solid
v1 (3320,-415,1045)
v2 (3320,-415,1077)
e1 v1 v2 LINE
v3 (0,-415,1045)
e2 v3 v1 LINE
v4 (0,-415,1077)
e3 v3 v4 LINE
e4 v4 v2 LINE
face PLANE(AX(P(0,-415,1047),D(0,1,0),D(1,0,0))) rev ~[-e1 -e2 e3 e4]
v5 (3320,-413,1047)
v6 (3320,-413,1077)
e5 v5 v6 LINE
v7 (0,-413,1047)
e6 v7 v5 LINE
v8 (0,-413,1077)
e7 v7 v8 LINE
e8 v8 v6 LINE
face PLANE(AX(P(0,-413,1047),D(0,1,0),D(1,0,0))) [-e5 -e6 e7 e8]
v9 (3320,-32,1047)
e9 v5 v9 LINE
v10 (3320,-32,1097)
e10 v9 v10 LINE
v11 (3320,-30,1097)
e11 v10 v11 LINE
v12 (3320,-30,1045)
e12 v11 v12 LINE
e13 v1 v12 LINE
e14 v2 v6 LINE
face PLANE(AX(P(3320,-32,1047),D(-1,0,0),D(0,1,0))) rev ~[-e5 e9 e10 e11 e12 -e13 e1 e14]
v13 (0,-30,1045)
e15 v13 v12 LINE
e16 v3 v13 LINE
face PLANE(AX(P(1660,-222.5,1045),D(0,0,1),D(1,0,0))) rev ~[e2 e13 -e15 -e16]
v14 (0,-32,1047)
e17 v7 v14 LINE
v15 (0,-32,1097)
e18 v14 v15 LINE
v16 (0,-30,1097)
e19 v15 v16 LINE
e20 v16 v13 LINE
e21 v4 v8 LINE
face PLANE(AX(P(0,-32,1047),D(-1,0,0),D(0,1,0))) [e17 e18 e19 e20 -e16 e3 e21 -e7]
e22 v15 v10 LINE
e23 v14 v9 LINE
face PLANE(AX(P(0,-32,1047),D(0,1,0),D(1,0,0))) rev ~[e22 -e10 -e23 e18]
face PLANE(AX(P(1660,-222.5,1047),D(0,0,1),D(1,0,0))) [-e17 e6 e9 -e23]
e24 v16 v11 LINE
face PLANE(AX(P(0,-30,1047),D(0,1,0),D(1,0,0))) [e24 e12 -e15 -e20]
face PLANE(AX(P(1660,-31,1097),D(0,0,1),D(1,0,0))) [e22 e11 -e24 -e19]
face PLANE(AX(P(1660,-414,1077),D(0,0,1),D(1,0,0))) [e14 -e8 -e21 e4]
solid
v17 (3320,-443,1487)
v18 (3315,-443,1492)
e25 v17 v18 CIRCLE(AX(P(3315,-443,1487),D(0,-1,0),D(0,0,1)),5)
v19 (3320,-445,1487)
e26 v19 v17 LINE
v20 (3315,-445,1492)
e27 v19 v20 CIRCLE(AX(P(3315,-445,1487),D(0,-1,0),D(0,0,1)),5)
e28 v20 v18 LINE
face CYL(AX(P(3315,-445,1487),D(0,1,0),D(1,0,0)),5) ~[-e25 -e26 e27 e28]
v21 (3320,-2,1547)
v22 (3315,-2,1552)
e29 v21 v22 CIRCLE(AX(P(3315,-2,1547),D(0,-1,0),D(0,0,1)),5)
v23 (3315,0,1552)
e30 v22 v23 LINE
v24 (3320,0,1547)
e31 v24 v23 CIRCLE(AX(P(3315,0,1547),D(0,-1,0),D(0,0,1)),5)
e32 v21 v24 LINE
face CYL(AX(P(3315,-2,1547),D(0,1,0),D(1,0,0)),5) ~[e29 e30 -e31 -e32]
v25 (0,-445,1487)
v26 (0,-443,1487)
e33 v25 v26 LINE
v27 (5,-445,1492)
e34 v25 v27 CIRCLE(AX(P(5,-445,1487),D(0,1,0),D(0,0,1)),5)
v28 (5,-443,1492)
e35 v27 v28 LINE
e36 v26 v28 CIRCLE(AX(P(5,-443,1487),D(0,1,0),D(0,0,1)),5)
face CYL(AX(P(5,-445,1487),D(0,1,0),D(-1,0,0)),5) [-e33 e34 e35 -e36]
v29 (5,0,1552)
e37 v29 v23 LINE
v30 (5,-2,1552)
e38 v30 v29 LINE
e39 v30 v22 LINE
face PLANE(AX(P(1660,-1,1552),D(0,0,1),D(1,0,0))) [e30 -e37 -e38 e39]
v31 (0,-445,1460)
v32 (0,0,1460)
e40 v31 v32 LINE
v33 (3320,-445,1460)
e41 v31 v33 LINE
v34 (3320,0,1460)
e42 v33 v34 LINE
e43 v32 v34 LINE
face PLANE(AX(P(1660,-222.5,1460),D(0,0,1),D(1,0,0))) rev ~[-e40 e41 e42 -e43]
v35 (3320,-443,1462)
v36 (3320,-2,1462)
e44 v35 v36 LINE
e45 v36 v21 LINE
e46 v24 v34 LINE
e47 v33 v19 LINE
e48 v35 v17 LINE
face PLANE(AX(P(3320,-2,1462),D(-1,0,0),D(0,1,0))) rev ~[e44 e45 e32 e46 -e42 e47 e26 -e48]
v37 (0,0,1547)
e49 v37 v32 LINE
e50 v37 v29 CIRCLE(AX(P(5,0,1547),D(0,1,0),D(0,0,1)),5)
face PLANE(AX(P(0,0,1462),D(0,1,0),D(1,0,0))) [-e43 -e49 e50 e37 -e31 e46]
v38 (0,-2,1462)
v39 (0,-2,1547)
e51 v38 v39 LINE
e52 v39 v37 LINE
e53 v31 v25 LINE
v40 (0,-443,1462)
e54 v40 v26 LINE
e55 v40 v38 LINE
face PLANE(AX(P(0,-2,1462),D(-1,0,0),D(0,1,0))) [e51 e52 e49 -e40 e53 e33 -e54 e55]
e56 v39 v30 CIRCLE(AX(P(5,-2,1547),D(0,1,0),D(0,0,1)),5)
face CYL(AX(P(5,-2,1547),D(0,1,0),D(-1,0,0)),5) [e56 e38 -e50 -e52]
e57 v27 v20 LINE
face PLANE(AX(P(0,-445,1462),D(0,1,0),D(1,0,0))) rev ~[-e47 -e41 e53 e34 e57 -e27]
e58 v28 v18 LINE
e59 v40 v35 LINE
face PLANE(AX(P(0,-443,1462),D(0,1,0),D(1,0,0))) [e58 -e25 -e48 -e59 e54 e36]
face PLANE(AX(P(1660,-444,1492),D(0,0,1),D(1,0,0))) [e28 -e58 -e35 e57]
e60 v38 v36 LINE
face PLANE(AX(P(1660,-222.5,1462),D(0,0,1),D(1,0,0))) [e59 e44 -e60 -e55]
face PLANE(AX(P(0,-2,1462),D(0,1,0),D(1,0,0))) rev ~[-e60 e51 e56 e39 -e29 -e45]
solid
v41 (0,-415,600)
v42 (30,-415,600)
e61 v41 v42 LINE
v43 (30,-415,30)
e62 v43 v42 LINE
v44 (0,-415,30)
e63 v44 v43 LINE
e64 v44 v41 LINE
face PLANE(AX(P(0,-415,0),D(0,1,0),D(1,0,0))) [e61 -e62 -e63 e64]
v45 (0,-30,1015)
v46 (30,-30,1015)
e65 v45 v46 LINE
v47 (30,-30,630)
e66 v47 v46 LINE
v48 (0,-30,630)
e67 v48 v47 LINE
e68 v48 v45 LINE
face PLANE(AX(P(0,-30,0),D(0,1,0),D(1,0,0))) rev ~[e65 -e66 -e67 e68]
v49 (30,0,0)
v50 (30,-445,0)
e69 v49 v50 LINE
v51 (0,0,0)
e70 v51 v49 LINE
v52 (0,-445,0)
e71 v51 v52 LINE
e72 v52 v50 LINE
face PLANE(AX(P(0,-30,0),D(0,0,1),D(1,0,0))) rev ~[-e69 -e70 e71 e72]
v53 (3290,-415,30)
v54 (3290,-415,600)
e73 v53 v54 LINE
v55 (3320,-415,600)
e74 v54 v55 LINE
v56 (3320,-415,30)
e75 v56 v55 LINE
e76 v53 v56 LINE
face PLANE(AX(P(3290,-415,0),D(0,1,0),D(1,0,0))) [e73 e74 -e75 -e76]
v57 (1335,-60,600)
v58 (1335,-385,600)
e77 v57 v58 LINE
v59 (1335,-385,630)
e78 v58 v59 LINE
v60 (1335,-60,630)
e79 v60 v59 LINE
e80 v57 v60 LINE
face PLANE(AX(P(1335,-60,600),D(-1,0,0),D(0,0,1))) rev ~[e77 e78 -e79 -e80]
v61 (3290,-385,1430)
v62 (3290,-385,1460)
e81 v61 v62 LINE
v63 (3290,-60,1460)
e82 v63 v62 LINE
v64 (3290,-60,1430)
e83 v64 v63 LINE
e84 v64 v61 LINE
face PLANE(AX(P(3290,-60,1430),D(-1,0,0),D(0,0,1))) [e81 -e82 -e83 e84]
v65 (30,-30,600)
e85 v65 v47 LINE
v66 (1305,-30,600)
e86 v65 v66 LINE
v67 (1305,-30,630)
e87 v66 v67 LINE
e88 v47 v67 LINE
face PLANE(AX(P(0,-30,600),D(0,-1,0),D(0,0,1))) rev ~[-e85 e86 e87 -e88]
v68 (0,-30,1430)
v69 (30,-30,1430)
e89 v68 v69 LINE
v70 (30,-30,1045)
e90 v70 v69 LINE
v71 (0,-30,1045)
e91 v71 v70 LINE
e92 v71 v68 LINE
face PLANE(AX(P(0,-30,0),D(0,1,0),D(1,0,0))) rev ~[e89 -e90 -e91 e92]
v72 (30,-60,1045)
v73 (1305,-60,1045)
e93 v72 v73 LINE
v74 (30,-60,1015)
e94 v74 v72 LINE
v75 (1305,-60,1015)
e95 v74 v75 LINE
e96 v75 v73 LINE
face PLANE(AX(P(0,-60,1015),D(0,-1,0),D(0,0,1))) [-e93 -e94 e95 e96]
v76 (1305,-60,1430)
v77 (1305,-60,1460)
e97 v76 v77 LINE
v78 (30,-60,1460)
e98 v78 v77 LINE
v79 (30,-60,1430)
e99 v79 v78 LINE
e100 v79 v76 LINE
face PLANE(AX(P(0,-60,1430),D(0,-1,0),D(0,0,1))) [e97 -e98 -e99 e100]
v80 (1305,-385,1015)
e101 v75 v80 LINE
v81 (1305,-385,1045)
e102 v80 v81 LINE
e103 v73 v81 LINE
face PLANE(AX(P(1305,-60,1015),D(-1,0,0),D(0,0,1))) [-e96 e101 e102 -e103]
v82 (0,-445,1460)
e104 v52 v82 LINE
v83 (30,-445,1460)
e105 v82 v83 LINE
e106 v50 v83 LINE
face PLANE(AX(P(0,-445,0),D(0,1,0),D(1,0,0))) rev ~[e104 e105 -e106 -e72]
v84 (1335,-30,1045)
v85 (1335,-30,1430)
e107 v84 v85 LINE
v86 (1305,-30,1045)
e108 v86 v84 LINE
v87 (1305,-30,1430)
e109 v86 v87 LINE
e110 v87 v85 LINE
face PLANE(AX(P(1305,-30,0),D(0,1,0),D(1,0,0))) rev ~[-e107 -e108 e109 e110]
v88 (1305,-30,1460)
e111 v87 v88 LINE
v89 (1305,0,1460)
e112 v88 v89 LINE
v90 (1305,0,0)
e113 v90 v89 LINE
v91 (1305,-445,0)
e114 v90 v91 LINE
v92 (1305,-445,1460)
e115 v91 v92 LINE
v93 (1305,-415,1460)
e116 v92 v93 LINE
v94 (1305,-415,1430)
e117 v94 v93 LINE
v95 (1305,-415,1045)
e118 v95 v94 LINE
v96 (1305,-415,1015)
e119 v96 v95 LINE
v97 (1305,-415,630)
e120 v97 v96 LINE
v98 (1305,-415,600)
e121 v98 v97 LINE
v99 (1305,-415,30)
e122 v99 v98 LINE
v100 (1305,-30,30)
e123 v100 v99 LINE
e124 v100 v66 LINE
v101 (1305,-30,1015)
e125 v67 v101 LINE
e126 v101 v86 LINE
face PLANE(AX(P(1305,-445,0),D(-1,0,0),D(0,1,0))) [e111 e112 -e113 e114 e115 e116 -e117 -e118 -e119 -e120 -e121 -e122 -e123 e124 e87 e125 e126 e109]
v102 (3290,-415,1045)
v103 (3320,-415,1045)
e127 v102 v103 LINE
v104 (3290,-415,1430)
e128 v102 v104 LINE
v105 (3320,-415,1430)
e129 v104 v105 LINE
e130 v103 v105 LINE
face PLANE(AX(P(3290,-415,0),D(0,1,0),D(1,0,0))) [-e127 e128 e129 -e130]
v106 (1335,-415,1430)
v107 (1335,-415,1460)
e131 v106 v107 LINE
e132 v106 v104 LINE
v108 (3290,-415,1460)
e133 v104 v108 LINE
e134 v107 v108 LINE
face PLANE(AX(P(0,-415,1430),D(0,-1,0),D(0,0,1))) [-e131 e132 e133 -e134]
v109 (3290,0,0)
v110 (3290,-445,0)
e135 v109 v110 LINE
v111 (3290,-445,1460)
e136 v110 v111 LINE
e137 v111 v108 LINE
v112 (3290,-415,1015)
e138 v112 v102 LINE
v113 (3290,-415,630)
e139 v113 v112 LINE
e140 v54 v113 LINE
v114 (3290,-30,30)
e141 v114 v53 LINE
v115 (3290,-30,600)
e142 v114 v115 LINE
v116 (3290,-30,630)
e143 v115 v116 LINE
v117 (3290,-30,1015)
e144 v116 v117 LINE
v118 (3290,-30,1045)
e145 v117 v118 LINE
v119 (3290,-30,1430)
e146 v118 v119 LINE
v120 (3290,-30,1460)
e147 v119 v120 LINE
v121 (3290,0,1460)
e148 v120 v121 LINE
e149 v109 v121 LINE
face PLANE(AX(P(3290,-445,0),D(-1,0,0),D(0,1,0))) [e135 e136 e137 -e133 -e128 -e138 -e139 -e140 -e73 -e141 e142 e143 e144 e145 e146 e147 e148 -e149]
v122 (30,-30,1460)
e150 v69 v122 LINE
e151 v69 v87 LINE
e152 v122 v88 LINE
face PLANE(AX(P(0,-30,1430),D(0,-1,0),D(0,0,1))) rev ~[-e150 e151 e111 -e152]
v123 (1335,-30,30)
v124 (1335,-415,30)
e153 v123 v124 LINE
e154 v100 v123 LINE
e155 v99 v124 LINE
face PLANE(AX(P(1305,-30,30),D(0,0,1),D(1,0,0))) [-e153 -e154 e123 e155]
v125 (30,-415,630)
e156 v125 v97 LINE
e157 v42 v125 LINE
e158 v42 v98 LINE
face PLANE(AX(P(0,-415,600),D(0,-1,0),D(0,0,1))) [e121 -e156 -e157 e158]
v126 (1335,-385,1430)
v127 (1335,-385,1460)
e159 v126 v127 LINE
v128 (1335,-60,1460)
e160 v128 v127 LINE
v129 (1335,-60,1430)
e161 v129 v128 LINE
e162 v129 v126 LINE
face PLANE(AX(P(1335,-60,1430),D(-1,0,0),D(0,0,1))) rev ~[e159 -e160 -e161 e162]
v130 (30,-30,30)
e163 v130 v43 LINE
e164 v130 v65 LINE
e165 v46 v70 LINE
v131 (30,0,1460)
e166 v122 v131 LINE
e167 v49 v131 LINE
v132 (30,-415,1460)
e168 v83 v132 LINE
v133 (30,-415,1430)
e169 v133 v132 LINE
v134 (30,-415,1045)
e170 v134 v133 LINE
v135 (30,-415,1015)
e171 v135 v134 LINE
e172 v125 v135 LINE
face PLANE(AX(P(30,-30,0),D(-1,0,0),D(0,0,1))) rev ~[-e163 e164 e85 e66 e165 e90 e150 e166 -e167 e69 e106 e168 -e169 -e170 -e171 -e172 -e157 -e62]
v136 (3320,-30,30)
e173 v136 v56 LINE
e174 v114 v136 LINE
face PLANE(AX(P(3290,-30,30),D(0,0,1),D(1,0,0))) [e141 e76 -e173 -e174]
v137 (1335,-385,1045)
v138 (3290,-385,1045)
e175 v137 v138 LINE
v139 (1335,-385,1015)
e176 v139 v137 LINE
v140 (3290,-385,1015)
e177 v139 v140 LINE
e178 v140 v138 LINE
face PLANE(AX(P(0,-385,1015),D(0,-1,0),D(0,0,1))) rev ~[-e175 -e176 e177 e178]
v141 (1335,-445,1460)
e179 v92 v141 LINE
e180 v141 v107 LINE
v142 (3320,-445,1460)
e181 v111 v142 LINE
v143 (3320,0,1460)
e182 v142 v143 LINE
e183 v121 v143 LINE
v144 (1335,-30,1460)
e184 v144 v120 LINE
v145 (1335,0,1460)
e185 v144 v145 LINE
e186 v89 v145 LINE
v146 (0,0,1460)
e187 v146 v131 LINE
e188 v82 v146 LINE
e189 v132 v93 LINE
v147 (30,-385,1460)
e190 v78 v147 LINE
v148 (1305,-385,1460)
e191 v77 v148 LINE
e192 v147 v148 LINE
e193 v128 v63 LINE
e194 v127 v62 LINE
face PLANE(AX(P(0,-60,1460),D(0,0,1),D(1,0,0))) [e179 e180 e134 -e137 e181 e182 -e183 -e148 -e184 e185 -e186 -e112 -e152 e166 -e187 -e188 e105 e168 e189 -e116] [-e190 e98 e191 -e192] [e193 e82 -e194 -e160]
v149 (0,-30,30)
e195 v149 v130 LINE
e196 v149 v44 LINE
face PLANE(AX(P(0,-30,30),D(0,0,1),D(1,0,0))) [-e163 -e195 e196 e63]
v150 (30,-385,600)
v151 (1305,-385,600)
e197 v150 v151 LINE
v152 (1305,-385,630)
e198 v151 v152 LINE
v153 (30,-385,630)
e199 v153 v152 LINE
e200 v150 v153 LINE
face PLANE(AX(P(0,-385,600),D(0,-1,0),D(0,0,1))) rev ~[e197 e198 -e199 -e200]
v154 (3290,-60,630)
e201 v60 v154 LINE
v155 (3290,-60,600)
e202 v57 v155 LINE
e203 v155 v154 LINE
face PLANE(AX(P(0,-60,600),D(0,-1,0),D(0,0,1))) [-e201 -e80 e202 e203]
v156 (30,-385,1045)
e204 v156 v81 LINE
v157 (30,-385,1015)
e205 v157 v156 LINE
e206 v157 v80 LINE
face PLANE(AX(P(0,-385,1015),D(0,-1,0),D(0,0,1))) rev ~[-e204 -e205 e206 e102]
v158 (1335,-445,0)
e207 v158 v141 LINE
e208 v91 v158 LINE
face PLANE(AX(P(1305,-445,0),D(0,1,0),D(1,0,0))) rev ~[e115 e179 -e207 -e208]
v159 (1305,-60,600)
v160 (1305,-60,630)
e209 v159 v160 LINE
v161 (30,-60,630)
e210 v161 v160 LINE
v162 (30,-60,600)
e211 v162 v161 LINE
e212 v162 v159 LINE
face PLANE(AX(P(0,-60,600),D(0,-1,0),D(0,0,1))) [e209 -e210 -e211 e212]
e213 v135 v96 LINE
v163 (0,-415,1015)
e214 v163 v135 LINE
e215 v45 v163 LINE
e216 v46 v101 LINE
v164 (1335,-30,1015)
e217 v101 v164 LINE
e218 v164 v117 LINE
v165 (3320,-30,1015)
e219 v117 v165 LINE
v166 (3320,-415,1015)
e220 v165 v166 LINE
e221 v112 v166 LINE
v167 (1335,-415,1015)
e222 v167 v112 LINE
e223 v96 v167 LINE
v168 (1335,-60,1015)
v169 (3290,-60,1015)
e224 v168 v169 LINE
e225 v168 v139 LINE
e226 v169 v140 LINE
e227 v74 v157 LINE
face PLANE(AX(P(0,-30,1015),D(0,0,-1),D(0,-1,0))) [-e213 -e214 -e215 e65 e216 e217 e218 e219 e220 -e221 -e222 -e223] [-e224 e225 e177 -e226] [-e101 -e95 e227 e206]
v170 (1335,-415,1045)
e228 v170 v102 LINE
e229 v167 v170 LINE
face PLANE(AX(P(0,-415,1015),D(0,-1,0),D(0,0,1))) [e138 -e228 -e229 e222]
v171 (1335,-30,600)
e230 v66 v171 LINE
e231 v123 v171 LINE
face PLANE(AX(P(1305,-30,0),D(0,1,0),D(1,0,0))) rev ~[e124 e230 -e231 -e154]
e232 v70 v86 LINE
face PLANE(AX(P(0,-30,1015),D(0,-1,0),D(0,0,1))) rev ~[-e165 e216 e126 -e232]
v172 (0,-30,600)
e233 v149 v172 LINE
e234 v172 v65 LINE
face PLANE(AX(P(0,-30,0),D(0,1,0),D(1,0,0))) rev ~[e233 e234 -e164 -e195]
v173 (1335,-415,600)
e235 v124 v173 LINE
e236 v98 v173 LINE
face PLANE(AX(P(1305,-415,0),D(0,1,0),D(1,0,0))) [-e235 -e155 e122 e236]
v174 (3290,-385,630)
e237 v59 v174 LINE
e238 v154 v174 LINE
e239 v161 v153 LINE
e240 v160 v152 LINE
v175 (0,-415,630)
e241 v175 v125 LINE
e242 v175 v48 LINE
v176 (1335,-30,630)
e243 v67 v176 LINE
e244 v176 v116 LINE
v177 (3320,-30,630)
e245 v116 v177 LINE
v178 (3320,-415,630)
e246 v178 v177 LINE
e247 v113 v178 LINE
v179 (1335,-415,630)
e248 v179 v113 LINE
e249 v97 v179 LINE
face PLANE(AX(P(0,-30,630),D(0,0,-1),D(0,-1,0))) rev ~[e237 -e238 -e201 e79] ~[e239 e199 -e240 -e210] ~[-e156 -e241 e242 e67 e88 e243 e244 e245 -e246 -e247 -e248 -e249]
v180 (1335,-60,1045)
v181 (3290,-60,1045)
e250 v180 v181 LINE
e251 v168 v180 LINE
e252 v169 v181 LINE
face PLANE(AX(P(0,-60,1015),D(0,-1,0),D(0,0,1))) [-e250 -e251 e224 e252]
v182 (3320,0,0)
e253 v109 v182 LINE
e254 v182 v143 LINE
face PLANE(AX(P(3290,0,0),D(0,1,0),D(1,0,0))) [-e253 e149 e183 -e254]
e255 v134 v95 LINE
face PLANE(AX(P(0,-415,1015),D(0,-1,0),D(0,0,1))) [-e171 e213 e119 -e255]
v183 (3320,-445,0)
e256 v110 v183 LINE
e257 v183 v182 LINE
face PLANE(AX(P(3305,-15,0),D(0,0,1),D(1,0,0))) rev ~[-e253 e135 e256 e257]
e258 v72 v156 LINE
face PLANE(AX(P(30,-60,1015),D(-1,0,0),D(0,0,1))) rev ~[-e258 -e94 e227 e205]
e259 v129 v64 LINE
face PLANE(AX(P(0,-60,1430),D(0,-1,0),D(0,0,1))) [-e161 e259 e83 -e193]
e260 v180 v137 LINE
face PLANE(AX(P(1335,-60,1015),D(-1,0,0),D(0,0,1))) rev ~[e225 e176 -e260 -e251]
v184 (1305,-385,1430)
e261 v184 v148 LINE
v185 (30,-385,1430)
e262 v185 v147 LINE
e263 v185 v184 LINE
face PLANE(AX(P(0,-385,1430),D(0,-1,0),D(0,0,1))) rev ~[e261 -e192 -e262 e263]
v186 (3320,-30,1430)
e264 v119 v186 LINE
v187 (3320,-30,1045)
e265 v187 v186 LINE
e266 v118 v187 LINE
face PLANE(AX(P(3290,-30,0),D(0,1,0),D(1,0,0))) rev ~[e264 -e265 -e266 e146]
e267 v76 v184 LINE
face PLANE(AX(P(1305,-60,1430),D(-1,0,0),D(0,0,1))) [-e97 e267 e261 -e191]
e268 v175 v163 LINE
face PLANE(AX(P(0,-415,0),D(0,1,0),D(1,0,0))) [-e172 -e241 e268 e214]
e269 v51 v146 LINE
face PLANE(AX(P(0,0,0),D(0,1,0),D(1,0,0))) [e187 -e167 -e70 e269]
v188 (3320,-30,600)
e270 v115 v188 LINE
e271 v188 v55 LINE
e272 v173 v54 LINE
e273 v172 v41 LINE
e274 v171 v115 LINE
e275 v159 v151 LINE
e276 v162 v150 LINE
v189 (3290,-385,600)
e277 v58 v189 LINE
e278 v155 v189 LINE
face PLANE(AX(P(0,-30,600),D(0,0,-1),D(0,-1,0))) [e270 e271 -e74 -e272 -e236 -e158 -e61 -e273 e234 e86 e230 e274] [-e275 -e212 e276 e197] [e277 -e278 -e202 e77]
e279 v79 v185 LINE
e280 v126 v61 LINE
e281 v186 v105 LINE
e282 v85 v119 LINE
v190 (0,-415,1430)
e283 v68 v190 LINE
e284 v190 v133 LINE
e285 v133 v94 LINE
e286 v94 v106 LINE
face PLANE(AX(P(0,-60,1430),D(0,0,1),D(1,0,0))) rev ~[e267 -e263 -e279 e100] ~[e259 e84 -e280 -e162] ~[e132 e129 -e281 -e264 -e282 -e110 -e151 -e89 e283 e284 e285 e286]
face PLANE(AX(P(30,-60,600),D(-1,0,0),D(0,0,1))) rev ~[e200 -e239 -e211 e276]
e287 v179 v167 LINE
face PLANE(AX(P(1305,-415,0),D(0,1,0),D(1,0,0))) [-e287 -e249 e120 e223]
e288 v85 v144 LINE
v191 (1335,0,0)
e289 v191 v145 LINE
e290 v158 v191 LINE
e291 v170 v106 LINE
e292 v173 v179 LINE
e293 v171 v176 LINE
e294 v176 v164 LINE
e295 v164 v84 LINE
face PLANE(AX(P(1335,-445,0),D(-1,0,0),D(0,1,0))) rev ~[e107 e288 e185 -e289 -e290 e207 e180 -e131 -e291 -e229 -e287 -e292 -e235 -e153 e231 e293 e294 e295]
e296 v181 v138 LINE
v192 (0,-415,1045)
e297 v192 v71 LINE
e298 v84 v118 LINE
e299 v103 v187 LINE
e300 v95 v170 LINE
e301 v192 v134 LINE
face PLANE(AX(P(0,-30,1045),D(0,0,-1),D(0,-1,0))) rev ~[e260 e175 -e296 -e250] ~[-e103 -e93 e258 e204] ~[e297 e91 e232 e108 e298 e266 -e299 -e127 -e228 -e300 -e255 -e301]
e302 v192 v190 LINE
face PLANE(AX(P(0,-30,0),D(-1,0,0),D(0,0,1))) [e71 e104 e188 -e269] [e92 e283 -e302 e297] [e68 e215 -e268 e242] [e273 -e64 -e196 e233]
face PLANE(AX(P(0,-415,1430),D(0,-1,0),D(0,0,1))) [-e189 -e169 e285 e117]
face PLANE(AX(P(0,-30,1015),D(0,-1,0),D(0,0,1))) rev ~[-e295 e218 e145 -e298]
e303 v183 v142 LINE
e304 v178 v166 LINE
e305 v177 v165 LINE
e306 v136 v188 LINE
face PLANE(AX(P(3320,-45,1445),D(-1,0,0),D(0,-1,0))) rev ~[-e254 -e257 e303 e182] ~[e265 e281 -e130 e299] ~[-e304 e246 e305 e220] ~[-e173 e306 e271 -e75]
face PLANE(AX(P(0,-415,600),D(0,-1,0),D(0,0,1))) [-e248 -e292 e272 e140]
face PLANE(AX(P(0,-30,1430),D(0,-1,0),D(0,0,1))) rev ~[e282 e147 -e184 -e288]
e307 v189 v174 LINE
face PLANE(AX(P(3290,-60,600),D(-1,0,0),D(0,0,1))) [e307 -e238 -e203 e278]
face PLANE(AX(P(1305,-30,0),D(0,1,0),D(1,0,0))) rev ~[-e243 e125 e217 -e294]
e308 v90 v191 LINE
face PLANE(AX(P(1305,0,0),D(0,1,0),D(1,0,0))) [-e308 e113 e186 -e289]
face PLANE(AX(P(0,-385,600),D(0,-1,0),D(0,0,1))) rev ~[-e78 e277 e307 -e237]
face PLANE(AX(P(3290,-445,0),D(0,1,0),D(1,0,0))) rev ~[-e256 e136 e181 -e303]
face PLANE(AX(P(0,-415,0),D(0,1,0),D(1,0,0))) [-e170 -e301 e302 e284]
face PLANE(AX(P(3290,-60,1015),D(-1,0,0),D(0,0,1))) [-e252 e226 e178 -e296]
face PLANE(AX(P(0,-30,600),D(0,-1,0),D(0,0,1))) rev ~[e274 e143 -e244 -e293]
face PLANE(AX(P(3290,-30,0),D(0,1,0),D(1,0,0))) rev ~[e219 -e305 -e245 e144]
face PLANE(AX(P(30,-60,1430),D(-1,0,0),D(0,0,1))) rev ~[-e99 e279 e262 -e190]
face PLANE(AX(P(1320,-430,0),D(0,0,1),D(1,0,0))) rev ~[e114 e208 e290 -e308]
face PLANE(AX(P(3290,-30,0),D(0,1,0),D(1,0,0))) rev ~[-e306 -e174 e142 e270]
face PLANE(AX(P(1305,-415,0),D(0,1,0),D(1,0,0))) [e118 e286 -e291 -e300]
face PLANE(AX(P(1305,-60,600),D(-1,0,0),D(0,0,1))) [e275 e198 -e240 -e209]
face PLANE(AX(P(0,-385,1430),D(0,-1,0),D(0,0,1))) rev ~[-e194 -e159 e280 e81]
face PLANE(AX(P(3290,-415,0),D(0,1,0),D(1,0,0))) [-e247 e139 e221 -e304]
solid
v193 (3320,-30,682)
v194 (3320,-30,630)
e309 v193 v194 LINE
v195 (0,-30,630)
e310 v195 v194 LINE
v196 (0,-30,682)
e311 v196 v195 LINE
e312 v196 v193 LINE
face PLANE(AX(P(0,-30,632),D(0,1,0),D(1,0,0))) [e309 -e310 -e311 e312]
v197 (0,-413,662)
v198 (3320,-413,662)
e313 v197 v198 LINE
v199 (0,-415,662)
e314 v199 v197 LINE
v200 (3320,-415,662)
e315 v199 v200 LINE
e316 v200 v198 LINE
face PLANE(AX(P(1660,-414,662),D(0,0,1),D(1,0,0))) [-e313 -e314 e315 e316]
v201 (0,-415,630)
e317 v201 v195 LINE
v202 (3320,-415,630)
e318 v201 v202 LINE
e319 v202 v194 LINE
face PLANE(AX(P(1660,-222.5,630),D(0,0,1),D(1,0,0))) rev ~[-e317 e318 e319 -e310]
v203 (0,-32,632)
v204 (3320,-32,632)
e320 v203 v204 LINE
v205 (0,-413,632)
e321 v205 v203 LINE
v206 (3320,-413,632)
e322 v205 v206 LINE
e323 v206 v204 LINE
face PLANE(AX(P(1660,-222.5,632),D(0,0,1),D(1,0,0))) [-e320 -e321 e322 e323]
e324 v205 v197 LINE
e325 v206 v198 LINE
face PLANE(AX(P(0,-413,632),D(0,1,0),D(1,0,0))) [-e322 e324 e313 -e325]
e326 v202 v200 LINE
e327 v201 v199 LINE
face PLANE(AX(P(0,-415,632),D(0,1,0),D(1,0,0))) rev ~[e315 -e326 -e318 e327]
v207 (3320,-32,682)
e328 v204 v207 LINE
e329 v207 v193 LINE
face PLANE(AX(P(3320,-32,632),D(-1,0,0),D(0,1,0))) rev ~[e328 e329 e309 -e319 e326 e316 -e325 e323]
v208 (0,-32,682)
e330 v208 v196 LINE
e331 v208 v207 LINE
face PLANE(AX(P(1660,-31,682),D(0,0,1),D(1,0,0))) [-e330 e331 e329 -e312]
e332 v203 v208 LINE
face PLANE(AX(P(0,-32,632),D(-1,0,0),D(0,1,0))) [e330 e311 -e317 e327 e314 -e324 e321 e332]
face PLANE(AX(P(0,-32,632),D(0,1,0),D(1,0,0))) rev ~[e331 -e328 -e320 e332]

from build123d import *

# Parameters (mm, degrees)
F0_W      = 30
F0_H      = 30
F1_DEPTH  = 1460
F2_W      = 30
F2_H      = 30
F3_DEPTH  = 3320
F4_W      = 30
F4_H      = 30
F5_DEPTH  = 325
F6_W      = 3320
F6_H      = 445
F7_DEPTH  = 2
F8_W      = 3320
F8_H      = 2
F9_DEPTH  = 30
F10_DEPTH = 90
F11_W     = 3320
F11_H     = 385
F12_DEPTH = 2
F13_W     = 3320
F13_H     = 385
F14_DEPTH = 2
F15_W     = 3320
F15_H     = 2
F16_DEPTH = 30
F17_W     = 3320
F17_H     = 2
F18_DEPTH = 30
F19_R     = 5
F20_W     = 30
F20_H     = 30
F21_DEPTH = 385
F22_DEPTH = 50
F23_DEPTH = 50


with BuildPart() as f1:
    # F0 (on Top) → F1 (new body)
    with BuildSketch(Plane.XY):
        with Locations((15, -15)):
            Rectangle(F0_W, F0_H)
    extrude(amount=F1_DEPTH)



with BuildPart() as f1b:
    # F0 (on Top) → F1, piece 2 (new body)
    with BuildSketch(Plane.XY):
        with Locations((1320, -15)):
            Rectangle(F0_W, F0_H)
    extrude(amount=F1_DEPTH)


with BuildPart() as f1c:
    # F0 (on Top) → F1, piece 3 (new body)
    with BuildSketch(Plane.XY):
        with Locations((3305, -15)):
            Rectangle(F0_W, F0_H)
    extrude(amount=F1_DEPTH)


with BuildPart() as f1d:
    # F0 (on Top) → F1, piece 4 (new body)
    with BuildSketch(Plane.XY):
        with Locations((15, -430)):
            Rectangle(F0_W, F0_H)
    extrude(amount=F1_DEPTH)



with BuildPart() as f1e:
    # F0 (on Top) → F1, piece 5 (new body)
    with BuildSketch(Plane.XY):
        with Locations((1320, -430)):
            Rectangle(F0_W, F0_H)
    extrude(amount=F1_DEPTH)


with BuildPart() as f1f:
    # F0 (on Top) → F1, piece 6 (new body)
    with BuildSketch(Plane.XY):
        with Locations((3305, -430)):
            Rectangle(F0_W, F0_H)
    extrude(amount=F1_DEPTH)


with BuildPart() as f1_1:
    add(f1.part)

    add(f1b.part)  # F3 merges F1b

    add(f1c.part)  # F3 merges F1c
    # F2 (on face) → F3 (join)
    with BuildSketch(Plane(origin=(0, 0, 0), x_dir=(0, -1, 0), z_dir=(-1, 0, 0))):
        with Locations((45, 1445)):
            Rectangle(F2_W, F2_H)
        with Locations((45, 1030)):
            Rectangle(F2_W, F2_H)
        with Locations((45, 615)):
            Rectangle(F2_W, F2_H)
    extrude(amount=-F3_DEPTH)



with BuildPart() as f1d_1:
    add(f1d.part)

    add(f1e.part)  # F3#2 merges F1e

    add(f1f.part)  # F3#2 merges F1f
    # F2 (on face) → F3, piece 2 (join)
    with BuildSketch(Plane(origin=(0, 0, 0), x_dir=(0, -1, 0), z_dir=(-1, 0, 0))):
        with Locations((400, 1445)):
            Rectangle(F2_W, F2_H)
        with Locations((400, 1030)):
            Rectangle(F2_W, F2_H)
        with Locations((400, 615)):
            Rectangle(F2_W, F2_H)
    extrude(amount=-F3_DEPTH)


with BuildPart() as f1_2:
    add(f1_1.part)

    add(f1d_1.part)  # F5 merges F1d
    # F4 (on face) → F5 (join, through all)
    with BuildSketch(Plane.XZ.offset(60)):
        with Locations((15, 1445)):
            Rectangle(F4_W, F4_H)
        with Locations((1320, 1445)):
            Rectangle(F4_W, F4_H)
        with Locations((3305, 1445)):
            Rectangle(F4_W, F4_H)
        with Locations((15, 1030)):
            Rectangle(F4_W, F4_H)
        with Locations((3305, 1030)):
            Rectangle(F4_W, F4_H)
        with Locations((1320, 1030)):
            Rectangle(F4_W, F4_H)
        with Locations((15, 615)):
            Rectangle(F4_W, F4_H)
        with Locations((3305, 615)):
            Rectangle(F4_W, F4_H)
        with Locations((1320, 615)):
            Rectangle(F4_W, F4_H)
    extrude(amount=F5_DEPTH)

    # F20 (on face) → F21 (join, through all)
    with BuildSketch(Plane.XZ.offset(30)):
        with Locations((15, 15)):
            Rectangle(F20_W, F20_H)
        with Locations((1320, 15)):
            Rectangle(F20_W, F20_H)
        with Locations((3305, 15)):
            Rectangle(F20_W, F20_H)
    extrude(amount=F21_DEPTH)


with BuildPart() as f7:
    # F6 (on face) → F7 (new body)
    with BuildSketch(Plane.XY.offset(1460)):
        with Locations((1660, -222.5)):
            Rectangle(F6_W, F6_H)
    extrude(amount=F7_DEPTH)

    # F8 (on face) → F9 (join)
    with BuildSketch(Plane.XY.offset(1462)):
        with Locations((1660, -444)):
            Rectangle(F8_W, F8_H)
    extrude(amount=F9_DEPTH)

    # F8 (on face) → F10 (join)
    with BuildSketch(Plane.XY.offset(1462)):
        with Locations((1660, -1)):
            Rectangle(F8_W, F8_H)
    extrude(amount=F10_DEPTH)

    # F19
    f19_edges = [f7.edges().sort_by_distance(p)[0] for p in [
        (0, -444, 1492),
        (3320, -444, 1492),
        (3320, -1, 1552),
        (0, -1, 1552),
    ]]
    fillet(f19_edges, radius=F19_R)


with BuildPart() as f12:
    # F11 (on face) → F12 (new body)
    with BuildSketch(Plane.XY.offset(1045)):
        with Locations((1660, -222.5)):
            Rectangle(F11_W, F11_H)
    extrude(amount=F12_DEPTH)

    # F15 (on face) → F16 (join)
    with BuildSketch(Plane.XY.offset(1047)):
        with Locations((1660, -414)):
            Rectangle(F15_W, F15_H)
    extrude(amount=F16_DEPTH)

    # F15 (on face) → F22 (join)
    with BuildSketch(Plane.XY.offset(1047)):
        with Locations((1660, -31)):
            Rectangle(F15_W, F15_H)
    extrude(amount=F22_DEPTH)


with BuildPart() as f14:
    # F13 (on face) → F14 (new body)
    with BuildSketch(Plane.XY.offset(630)):
        with Locations((1660, -222.5)):
            Rectangle(F13_W, F13_H)
    extrude(amount=F14_DEPTH)

    # F17 (on face) → F18 (join)
    with BuildSketch(Plane.XY.offset(632)):
        with Locations((1660, -414)):
            Rectangle(F17_W, F17_H)
    extrude(amount=F18_DEPTH)

    # F17 (on face) → F23 (join)
    with BuildSketch(Plane.XY.offset(632)):
        with Locations((1660, -31)):
            Rectangle(F17_W, F17_H)
    extrude(amount=F23_DEPTH)


solid = Compound([f1_2.part, f7.part, f12.part, f14.part])
